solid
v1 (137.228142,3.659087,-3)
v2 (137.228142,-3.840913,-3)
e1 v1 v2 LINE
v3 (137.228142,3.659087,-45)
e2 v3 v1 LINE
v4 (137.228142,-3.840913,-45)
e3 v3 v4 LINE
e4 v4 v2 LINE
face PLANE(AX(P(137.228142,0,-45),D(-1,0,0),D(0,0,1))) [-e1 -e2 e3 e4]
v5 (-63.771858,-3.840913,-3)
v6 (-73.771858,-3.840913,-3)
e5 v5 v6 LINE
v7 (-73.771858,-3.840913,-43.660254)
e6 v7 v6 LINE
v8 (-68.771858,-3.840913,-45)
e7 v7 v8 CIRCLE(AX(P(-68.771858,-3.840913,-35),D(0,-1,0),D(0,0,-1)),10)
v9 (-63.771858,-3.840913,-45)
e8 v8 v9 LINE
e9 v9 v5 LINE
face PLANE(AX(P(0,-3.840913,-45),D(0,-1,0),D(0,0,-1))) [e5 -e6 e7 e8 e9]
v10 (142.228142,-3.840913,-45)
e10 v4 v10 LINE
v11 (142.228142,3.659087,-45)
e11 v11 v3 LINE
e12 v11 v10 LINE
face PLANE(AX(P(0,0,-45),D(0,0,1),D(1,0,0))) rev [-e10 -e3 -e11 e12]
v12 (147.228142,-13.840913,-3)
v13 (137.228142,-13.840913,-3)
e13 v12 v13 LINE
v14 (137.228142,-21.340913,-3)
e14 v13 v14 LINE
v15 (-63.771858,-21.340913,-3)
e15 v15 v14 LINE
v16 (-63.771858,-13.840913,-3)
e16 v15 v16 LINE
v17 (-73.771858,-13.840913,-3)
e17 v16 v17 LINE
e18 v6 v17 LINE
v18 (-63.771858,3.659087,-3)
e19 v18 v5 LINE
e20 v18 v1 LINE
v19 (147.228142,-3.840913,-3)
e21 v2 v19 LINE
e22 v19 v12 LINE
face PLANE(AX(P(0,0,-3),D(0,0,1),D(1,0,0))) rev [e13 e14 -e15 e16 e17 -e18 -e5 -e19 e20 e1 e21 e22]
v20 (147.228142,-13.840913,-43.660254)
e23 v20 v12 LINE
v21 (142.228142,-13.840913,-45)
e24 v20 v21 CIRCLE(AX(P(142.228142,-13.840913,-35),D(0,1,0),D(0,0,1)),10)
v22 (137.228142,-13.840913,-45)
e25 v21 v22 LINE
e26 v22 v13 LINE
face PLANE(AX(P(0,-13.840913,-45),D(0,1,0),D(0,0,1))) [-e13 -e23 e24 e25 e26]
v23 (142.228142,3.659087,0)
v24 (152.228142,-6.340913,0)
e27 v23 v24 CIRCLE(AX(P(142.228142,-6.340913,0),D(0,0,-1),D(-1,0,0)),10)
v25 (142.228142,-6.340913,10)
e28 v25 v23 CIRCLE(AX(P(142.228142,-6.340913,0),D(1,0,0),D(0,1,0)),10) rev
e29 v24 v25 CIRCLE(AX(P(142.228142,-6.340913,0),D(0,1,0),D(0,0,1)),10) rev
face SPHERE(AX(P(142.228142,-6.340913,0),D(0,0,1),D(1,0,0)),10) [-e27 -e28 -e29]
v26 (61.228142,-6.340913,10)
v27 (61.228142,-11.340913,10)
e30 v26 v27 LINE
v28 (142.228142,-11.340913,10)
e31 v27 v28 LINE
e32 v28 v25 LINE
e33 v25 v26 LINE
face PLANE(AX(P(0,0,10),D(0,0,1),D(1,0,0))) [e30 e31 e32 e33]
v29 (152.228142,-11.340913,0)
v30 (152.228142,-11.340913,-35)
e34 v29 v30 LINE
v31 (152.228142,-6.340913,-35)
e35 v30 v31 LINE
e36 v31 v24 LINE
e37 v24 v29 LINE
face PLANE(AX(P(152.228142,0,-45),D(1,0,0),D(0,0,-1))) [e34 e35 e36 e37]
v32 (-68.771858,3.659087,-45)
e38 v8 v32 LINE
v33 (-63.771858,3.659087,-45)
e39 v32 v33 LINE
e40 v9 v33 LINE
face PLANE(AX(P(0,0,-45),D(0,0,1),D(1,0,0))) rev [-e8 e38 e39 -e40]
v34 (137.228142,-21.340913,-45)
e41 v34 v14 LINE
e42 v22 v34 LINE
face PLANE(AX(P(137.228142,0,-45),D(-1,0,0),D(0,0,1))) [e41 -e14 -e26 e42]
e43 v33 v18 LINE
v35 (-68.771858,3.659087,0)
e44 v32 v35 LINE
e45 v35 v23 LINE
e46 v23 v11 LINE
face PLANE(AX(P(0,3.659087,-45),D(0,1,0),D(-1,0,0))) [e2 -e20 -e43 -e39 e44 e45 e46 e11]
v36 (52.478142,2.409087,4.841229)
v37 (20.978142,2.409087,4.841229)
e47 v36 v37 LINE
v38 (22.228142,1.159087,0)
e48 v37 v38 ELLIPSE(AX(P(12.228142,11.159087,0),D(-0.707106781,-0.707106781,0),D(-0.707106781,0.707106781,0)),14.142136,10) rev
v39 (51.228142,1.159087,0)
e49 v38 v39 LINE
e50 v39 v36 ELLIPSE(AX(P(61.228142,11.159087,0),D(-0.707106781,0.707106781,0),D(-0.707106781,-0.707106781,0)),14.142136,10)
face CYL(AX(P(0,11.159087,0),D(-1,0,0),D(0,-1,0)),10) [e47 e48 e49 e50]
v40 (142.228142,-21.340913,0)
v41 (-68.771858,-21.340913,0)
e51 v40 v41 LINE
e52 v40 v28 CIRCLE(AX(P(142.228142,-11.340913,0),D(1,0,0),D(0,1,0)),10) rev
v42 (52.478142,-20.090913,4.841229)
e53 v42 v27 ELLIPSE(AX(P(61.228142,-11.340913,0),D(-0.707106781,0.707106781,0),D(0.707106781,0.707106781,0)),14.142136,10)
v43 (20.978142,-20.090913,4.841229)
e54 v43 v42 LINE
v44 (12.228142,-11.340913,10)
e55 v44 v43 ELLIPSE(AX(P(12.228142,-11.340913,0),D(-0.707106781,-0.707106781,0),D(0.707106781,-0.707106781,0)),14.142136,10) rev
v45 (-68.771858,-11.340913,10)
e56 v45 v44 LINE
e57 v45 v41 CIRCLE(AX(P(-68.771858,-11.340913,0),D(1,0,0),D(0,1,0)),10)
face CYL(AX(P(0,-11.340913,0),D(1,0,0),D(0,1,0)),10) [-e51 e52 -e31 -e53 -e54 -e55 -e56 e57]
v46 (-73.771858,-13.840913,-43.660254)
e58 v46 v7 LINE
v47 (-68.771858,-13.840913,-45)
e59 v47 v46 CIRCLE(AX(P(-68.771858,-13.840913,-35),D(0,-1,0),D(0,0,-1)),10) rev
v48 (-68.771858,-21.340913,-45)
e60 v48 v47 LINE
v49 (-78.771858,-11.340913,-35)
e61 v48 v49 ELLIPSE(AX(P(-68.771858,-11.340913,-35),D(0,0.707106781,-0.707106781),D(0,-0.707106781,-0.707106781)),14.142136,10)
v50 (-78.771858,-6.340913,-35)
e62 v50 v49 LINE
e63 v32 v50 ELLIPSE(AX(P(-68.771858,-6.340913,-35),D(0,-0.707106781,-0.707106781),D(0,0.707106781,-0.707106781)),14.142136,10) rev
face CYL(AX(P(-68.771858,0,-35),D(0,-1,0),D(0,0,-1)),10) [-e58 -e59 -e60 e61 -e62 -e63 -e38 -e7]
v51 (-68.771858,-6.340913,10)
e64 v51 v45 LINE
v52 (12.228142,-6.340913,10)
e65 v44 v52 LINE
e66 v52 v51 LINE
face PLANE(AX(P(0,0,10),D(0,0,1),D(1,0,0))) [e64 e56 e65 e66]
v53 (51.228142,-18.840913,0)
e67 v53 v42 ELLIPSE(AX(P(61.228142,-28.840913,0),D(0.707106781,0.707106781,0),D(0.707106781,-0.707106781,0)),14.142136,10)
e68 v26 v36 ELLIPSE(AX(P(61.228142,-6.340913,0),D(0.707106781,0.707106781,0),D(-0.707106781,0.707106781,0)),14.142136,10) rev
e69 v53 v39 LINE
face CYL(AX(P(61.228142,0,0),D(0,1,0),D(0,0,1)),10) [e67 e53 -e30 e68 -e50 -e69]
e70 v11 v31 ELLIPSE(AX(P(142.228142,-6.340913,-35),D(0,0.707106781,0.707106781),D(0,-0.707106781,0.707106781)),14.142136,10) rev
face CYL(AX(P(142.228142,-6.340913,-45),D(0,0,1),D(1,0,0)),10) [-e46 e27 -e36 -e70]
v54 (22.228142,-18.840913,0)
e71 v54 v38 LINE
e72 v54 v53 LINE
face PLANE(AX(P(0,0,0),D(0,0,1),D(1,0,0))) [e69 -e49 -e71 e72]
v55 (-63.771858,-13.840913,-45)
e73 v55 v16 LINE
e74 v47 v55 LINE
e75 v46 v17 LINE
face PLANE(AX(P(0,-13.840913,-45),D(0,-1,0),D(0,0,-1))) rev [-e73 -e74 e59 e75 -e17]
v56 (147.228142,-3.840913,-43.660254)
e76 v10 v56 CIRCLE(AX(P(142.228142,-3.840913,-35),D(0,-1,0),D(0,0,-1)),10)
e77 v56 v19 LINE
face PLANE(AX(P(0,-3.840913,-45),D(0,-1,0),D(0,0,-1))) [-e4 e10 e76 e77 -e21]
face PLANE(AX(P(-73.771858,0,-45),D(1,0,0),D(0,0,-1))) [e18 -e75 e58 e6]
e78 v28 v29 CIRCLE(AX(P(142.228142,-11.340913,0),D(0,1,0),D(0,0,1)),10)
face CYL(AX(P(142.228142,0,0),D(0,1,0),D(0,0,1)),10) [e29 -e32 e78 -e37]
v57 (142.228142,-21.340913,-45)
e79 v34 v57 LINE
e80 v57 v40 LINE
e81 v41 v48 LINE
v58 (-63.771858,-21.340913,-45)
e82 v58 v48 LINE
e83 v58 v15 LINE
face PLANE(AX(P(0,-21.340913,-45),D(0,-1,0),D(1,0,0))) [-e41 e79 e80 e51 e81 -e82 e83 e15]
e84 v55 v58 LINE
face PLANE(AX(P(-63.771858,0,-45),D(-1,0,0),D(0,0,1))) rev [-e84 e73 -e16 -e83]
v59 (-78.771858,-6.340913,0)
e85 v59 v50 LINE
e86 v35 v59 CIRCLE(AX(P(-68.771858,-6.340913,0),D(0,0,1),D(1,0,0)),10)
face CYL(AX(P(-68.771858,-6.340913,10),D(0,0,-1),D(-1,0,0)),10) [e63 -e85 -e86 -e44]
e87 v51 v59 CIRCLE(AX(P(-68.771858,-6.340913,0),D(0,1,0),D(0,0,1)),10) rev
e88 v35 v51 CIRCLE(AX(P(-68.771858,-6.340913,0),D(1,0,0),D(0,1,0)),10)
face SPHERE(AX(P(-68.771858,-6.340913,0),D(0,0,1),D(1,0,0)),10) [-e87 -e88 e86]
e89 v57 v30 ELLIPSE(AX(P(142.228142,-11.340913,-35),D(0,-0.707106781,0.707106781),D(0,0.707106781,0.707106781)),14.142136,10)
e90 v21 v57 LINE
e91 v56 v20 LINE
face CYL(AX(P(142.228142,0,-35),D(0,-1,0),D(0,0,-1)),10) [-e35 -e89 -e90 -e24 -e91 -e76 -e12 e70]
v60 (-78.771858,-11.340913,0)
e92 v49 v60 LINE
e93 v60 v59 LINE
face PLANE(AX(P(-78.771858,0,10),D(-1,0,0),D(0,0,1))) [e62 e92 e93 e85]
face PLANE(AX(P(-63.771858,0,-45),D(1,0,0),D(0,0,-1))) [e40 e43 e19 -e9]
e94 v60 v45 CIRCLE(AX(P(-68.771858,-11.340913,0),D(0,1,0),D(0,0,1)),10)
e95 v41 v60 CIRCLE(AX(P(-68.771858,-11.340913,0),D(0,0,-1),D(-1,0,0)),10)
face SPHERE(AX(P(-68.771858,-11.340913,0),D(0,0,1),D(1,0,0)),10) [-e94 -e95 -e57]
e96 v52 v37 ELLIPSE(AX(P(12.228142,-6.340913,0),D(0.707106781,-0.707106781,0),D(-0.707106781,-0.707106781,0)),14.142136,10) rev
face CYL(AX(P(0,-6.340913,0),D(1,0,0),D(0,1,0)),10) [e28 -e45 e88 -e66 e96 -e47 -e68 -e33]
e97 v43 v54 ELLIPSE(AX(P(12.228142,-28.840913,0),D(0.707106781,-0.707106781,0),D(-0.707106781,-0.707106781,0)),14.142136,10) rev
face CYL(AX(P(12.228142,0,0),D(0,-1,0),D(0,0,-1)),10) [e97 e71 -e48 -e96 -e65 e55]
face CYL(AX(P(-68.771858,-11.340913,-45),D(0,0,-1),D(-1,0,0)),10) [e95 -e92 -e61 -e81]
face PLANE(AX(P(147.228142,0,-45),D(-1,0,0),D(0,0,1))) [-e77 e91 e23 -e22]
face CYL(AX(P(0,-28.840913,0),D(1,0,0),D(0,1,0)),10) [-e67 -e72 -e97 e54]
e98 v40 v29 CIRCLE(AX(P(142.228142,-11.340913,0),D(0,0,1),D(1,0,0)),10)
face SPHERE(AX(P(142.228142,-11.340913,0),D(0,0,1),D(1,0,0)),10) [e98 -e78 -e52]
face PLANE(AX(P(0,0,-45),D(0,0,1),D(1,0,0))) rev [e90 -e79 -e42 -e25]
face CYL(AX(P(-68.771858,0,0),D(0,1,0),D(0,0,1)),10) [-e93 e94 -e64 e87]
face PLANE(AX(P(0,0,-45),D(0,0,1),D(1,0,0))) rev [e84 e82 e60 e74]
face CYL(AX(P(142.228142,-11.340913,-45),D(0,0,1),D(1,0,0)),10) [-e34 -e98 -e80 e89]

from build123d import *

# Parameters (mm, degrees)
BOSS_EXTRUDE1_DEPTH   = 45
BOSS_EXTRUDE1_2_DEPTH = 45
SKETCH1_3_W           = 231
SKETCH1_3_H           = 25
SKETCH1_3_W_2         = 29
SKETCH1_3_H_2         = 20
BOSS_EXTRUDE2_DEPTH   = 10
BOSS_EXTRUDE3_DEPTH   = 3
FILLET1_R             = 10
FILLET2_R             = 10
FILLET3_R             = 10


with BuildPart() as part:
    # Sketch1 → Boss-Extrude1 (new body)
    with BuildSketch(Plane.XY):
        Polygon((-63.771858253, 3.659087495), (-78.771858253, 3.659087495), (-78.771858253, -21.340912505), (-63.771858253, -21.340912505), (-63.771858253, -13.840912505), (-73.771858253, -13.840912505), (-73.771858253, -3.840912505), (-63.771858253, -3.840912505), align=None)
    extrude(amount=-BOSS_EXTRUDE1_DEPTH)



with BuildPart() as body_2:
    # Sketch1 → Boss-Extrude1 2 (new body)
    with BuildSketch(Plane.XY):
        Polygon((137.228141747, 3.659087495), (137.228141747, -3.840912505), (147.228141747, -3.840912505), (147.228141747, -13.840912505), (137.228141747, -13.840912505), (137.228141747, -21.340912505), (152.228141747, -21.340912505), (152.228141747, 3.659087495), align=None)
    extrude(amount=-BOSS_EXTRUDE1_2_DEPTH)


with BuildPart() as part_1:
    add(part.part)

    add(body_2.part)  # Boss-Extrude2 merges body 2
    # Sketch1<3> → Boss-Extrude2 (add)
    with BuildSketch(Plane.XY):
        with Locations((36.728141747, -8.840912505)):
            Rectangle(SKETCH1_3_W, SKETCH1_3_H)
        with Locations((36.728141747, -8.840912505)):
            Rectangle(SKETCH1_3_W_2, SKETCH1_3_H_2, mode=Mode.SUBTRACT)
    extrude(amount=BOSS_EXTRUDE2_DEPTH)

    # Sketch1<4> → Boss-Extrude3 (add)
    with BuildSketch(Plane.XY):
        Polygon((137.228141747, 3.659087495), (-63.771858253, 3.659087495), (-63.771858253, -3.840912505), (-73.771858253, -3.840912505), (-73.771858253, -13.840912505), (-63.771858253, -13.840912505), (-63.771858253, -21.340912505), (137.228141747, -21.340912505), (137.228141747, -13.840912505), (147.228141747, -13.840912505), (147.228141747, -3.840912505), (137.228141747, -3.840912505), align=None)
    extrude(amount=-BOSS_EXTRUDE3_DEPTH)

    # Fillet1
    # the kernel refuses this fillet: 10 mm, written as the material it takes off along each edge
    with BuildSketch(Plane(origin=(22.228141747, 1.159087495, 10), x_dir=(0, 1, 0), z_dir=(1, 0, 0)), Plane(origin=(51.228141747, -18.840912505, 10), x_dir=(0, -1, 0), z_dir=(-1, 0, 0))) as fillet1_piece_1:
        with BuildLine():
            CenterArc((FILLET1_R, -FILLET1_R), FILLET1_R, 90, 90)
            Line((0, -FILLET1_R), (-FILLET1_R * 0.02, -FILLET1_R))
            Line((-FILLET1_R * 0.02, -FILLET1_R), (-FILLET1_R * 0.02, FILLET1_R * 0.02))
            Line((-FILLET1_R * 0.02, FILLET1_R * 0.02), (FILLET1_R, FILLET1_R * 0.02))
            Line((FILLET1_R, FILLET1_R * 0.02), (FILLET1_R, 0))
        make_face()
    extrude(amount=29, mode=Mode.SUBTRACT)
    with BuildSketch(Plane(origin=(22.228141747, -18.840912505, 10), x_dir=(-1, 0, 0), z_dir=(0, 1, 0)), Plane(origin=(51.228141747, 1.159087495, 10), x_dir=(1, 0, 0), z_dir=(0, -1, 0))) as fillet1_piece_2:
        with BuildLine():
            CenterArc((FILLET1_R, -FILLET1_R), FILLET1_R, 90, 90)
            Line((0, -FILLET1_R), (-FILLET1_R * 0.02, -FILLET1_R))
            Line((-FILLET1_R * 0.02, -FILLET1_R), (-FILLET1_R * 0.02, FILLET1_R * 0.02))
            Line((-FILLET1_R * 0.02, FILLET1_R * 0.02), (FILLET1_R, FILLET1_R * 0.02))
            Line((FILLET1_R, FILLET1_R * 0.02), (FILLET1_R, 0))
        make_face()
    extrude(amount=20, mode=Mode.SUBTRACT)
    with BuildSketch(Plane(origin=(-78.771858253, 3.659087495, 10), x_dir=(0, 0, -1), z_dir=(0, -1, 0))) as fillet1_piece_3:
        with BuildLine():
            CenterArc((FILLET1_R, FILLET1_R), FILLET1_R, 180, 90)
            Line((0, FILLET1_R), (-FILLET1_R * 0.02, FILLET1_R))
            Line((-FILLET1_R * 0.02, FILLET1_R), (-FILLET1_R * 0.02, -FILLET1_R * 0.02))
            Line((-FILLET1_R * 0.02, -FILLET1_R * 0.02), (FILLET1_R, -FILLET1_R * 0.02))
            Line((FILLET1_R, -FILLET1_R * 0.02), (FILLET1_R, 0))
        make_face()
    extrude(amount=25, mode=Mode.SUBTRACT)
    with BuildSketch(Plane(origin=(152.228141747, 3.659087495, 10), x_dir=(0, 0, -1), z_dir=(-1, 0, 0)), Plane(origin=(-78.771858253, -21.340912505, 10), x_dir=(0, 0, -1), z_dir=(1, 0, 0))) as fillet1_piece_4:
        with BuildLine():
            CenterArc((FILLET1_R, FILLET1_R), FILLET1_R, 180, 90)
            Line((0, FILLET1_R), (-FILLET1_R * 0.02, FILLET1_R))
            Line((-FILLET1_R * 0.02, FILLET1_R), (-FILLET1_R * 0.02, -FILLET1_R * 0.02))
            Line((-FILLET1_R * 0.02, -FILLET1_R * 0.02), (FILLET1_R, -FILLET1_R * 0.02))
            Line((FILLET1_R, -FILLET1_R * 0.02), (FILLET1_R, 0))
        make_face()
    extrude(amount=231, mode=Mode.SUBTRACT)
    with BuildSketch(Plane(origin=(152.228141747, -21.340912505, 10), x_dir=(-1, 0, 0), z_dir=(0, 1, 0))) as fillet1_piece_5:
        with BuildLine():
            CenterArc((FILLET1_R, -FILLET1_R), FILLET1_R, 90, 90)
            Line((0, -FILLET1_R), (-FILLET1_R * 0.02, -FILLET1_R))
            Line((-FILLET1_R * 0.02, -FILLET1_R), (-FILLET1_R * 0.02, FILLET1_R * 0.02))
            Line((-FILLET1_R * 0.02, FILLET1_R * 0.02), (FILLET1_R, FILLET1_R * 0.02))
            Line((FILLET1_R, FILLET1_R * 0.02), (FILLET1_R, 0))
        make_face()
    extrude(amount=25, mode=Mode.SUBTRACT)
    with BuildSketch(Plane(origin=(22.228141747, -18.840912505, 10), x_dir=(-1, 0, 0), z_dir=(0, 1, 0))) as fillet1_piece_6a_section:
        with BuildLine():
            CenterArc((FILLET1_R, -FILLET1_R), FILLET1_R, 90, 90)
            Line((0, -FILLET1_R), (-FILLET1_R * 0.02, -FILLET1_R))
            Line((-FILLET1_R * 0.02, -FILLET1_R), (-FILLET1_R * 0.02, FILLET1_R * 0.02))
            Line((-FILLET1_R * 0.02, FILLET1_R * 0.02), (FILLET1_R, FILLET1_R * 0.02))
            Line((FILLET1_R, FILLET1_R * 0.02), (FILLET1_R, 0))
        make_face()
    fillet1_piece_6a = extrude(amount=45, mode=Mode.PRIVATE)
    fillet1_piece_6a = split(fillet1_piece_6a, bisect_by=Plane(origin=(19.964190605, 1.159087495, 7.736048857), z_dir=(0, 1, 0)), keep=Keep.TOP, mode=Mode.PRIVATE)
    with BuildSketch(Plane(origin=(-2.771858253, 1.159087495, 10), x_dir=(0, 1, 0), z_dir=(1, 0, 0))) as fillet1_piece_6b_section:
        with BuildLine():
            CenterArc((FILLET1_R, -FILLET1_R), FILLET1_R, 90, 90)
            Line((0, -FILLET1_R), (-FILLET1_R * 0.02, -FILLET1_R))
            Line((-FILLET1_R * 0.02, -FILLET1_R), (-FILLET1_R * 0.02, FILLET1_R * 0.02))
            Line((-FILLET1_R * 0.02, FILLET1_R * 0.02), (FILLET1_R, FILLET1_R * 0.02))
            Line((FILLET1_R, FILLET1_R * 0.02), (FILLET1_R, 0))
        make_face()
    fillet1_piece_6b = extrude(amount=54, mode=Mode.PRIVATE)
    fillet1_piece_6b = split(fillet1_piece_6b, bisect_by=Plane(origin=(22.228141747, 3.423038638, 7.736048857), z_dir=(-1, 0, 0)), keep=Keep.TOP, mode=Mode.PRIVATE)
    fillet1_piece_6 = fillet1_piece_6a & fillet1_piece_6b
    add(fillet1_piece_6, mode=Mode.SUBTRACT)
    with BuildSketch(Plane(origin=(22.228141747, 1.159087495, 10), x_dir=(0, 1, 0), z_dir=(1, 0, 0))) as fillet1_piece_7a_section:
        with BuildLine():
            CenterArc((FILLET1_R, -FILLET1_R), FILLET1_R, 90, 90)
            Line((0, -FILLET1_R), (-FILLET1_R * 0.02, -FILLET1_R))
            Line((-FILLET1_R * 0.02, -FILLET1_R), (-FILLET1_R * 0.02, FILLET1_R * 0.02))
            Line((-FILLET1_R * 0.02, FILLET1_R * 0.02), (FILLET1_R, FILLET1_R * 0.02))
            Line((FILLET1_R, FILLET1_R * 0.02), (FILLET1_R, 0))
        make_face()
    fillet1_piece_7a = extrude(amount=54, mode=Mode.PRIVATE)
    fillet1_piece_7a = split(fillet1_piece_7a, bisect_by=Plane(origin=(51.228141747, 3.423038638, 7.736048857), z_dir=(1, 0, 0)), keep=Keep.TOP, mode=Mode.PRIVATE)
    with BuildSketch(Plane(origin=(51.228141747, 26.159087495, 10), x_dir=(1, 0, 0), z_dir=(0, -1, 0))) as fillet1_piece_7b_section:
        with BuildLine():
            CenterArc((FILLET1_R, -FILLET1_R), FILLET1_R, 90, 90)
            Line((0, -FILLET1_R), (-FILLET1_R * 0.02, -FILLET1_R))
            Line((-FILLET1_R * 0.02, -FILLET1_R), (-FILLET1_R * 0.02, FILLET1_R * 0.02))
            Line((-FILLET1_R * 0.02, FILLET1_R * 0.02), (FILLET1_R, FILLET1_R * 0.02))
            Line((FILLET1_R, FILLET1_R * 0.02), (FILLET1_R, 0))
        make_face()
    fillet1_piece_7b = extrude(amount=45, mode=Mode.PRIVATE)
    fillet1_piece_7b = split(fillet1_piece_7b, bisect_by=Plane(origin=(53.49209289, 1.159087495, 7.736048857), z_dir=(0, 1, 0)), keep=Keep.TOP, mode=Mode.PRIVATE)
    fillet1_piece_7 = fillet1_piece_7a & fillet1_piece_7b
    add(fillet1_piece_7, mode=Mode.SUBTRACT)
    with BuildSketch(Plane(origin=(51.228141747, -18.840912505, 10), x_dir=(0, -1, 0), z_dir=(-1, 0, 0))) as fillet1_piece_8a_section:
        with BuildLine():
            CenterArc((FILLET1_R, -FILLET1_R), FILLET1_R, 90, 90)
            Line((0, -FILLET1_R), (-FILLET1_R * 0.02, -FILLET1_R))
            Line((-FILLET1_R * 0.02, -FILLET1_R), (-FILLET1_R * 0.02, FILLET1_R * 0.02))
            Line((-FILLET1_R * 0.02, FILLET1_R * 0.02), (FILLET1_R, FILLET1_R * 0.02))
            Line((FILLET1_R, FILLET1_R * 0.02), (FILLET1_R, 0))
        make_face()
    fillet1_piece_8a = extrude(amount=54, mode=Mode.PRIVATE)
    fillet1_piece_8a = split(fillet1_piece_8a, bisect_by=Plane(origin=(22.228141747, -21.104863647, 7.736048857), z_dir=(-1, 0, 0)), keep=Keep.TOP, mode=Mode.PRIVATE)
    with BuildSketch(Plane(origin=(22.228141747, -43.840912505, 10), x_dir=(-1, 0, 0), z_dir=(0, 1, 0))) as fillet1_piece_8b_section:
        with BuildLine():
            CenterArc((FILLET1_R, -FILLET1_R), FILLET1_R, 90, 90)
            Line((0, -FILLET1_R), (-FILLET1_R * 0.02, -FILLET1_R))
            Line((-FILLET1_R * 0.02, -FILLET1_R), (-FILLET1_R * 0.02, FILLET1_R * 0.02))
            Line((-FILLET1_R * 0.02, FILLET1_R * 0.02), (FILLET1_R, FILLET1_R * 0.02))
            Line((FILLET1_R, FILLET1_R * 0.02), (FILLET1_R, 0))
        make_face()
    fillet1_piece_8b = extrude(amount=45, mode=Mode.PRIVATE)
    fillet1_piece_8b = split(fillet1_piece_8b, bisect_by=Plane(origin=(19.964190605, -18.840912505, 7.736048857), z_dir=(0, -1, 0)), keep=Keep.TOP, mode=Mode.PRIVATE)
    fillet1_piece_8 = fillet1_piece_8a & fillet1_piece_8b
    add(fillet1_piece_8, mode=Mode.SUBTRACT)
    with BuildSketch(Plane(origin=(76.228141747, -18.840912505, 10), x_dir=(0, -1, 0), z_dir=(-1, 0, 0))) as fillet1_piece_9a_section:
        with BuildLine():
            CenterArc((FILLET1_R, -FILLET1_R), FILLET1_R, 90, 90)
            Line((0, -FILLET1_R), (-FILLET1_R * 0.02, -FILLET1_R))
            Line((-FILLET1_R * 0.02, -FILLET1_R), (-FILLET1_R * 0.02, FILLET1_R * 0.02))
            Line((-FILLET1_R * 0.02, FILLET1_R * 0.02), (FILLET1_R, FILLET1_R * 0.02))
            Line((FILLET1_R, FILLET1_R * 0.02), (FILLET1_R, 0))
        make_face()
    fillet1_piece_9a = extrude(amount=54, mode=Mode.PRIVATE)
    fillet1_piece_9a = split(fillet1_piece_9a, bisect_by=Plane(origin=(51.228141747, -21.104863647, 7.736048857), z_dir=(1, 0, 0)), keep=Keep.TOP, mode=Mode.PRIVATE)
    with BuildSketch(Plane(origin=(51.228141747, 1.159087495, 10), x_dir=(1, 0, 0), z_dir=(0, -1, 0))) as fillet1_piece_9b_section:
        with BuildLine():
            CenterArc((FILLET1_R, -FILLET1_R), FILLET1_R, 90, 90)
            Line((0, -FILLET1_R), (-FILLET1_R * 0.02, -FILLET1_R))
            Line((-FILLET1_R * 0.02, -FILLET1_R), (-FILLET1_R * 0.02, FILLET1_R * 0.02))
            Line((-FILLET1_R * 0.02, FILLET1_R * 0.02), (FILLET1_R, FILLET1_R * 0.02))
            Line((FILLET1_R, FILLET1_R * 0.02), (FILLET1_R, 0))
        make_face()
    fillet1_piece_9b = extrude(amount=45, mode=Mode.PRIVATE)
    fillet1_piece_9b = split(fillet1_piece_9b, bisect_by=Plane(origin=(53.49209289, -18.840912505, 7.736048857), z_dir=(0, -1, 0)), keep=Keep.TOP, mode=Mode.PRIVATE)
    fillet1_piece_9 = fillet1_piece_9a & fillet1_piece_9b
    add(fillet1_piece_9, mode=Mode.SUBTRACT)
    with BuildSketch(Plane(origin=(152.228141747, 3.659087495, 10), x_dir=(0, 0, -1), z_dir=(-1, 0, 0))) as fillet1_piece_10a_section:
        with BuildLine():
            CenterArc((FILLET1_R, FILLET1_R), FILLET1_R, 180, 90)
            Line((0, FILLET1_R), (-FILLET1_R * 0.02, FILLET1_R))
            Line((-FILLET1_R * 0.02, FILLET1_R), (-FILLET1_R * 0.02, -FILLET1_R * 0.02))
            Line((-FILLET1_R * 0.02, -FILLET1_R * 0.02), (FILLET1_R, -FILLET1_R * 0.02))
            Line((FILLET1_R, -FILLET1_R * 0.02), (FILLET1_R, 0))
        make_face()
    fillet1_piece_10a = extrude(amount=256, mode=Mode.PRIVATE)
    fillet1_piece_10a = split(fillet1_piece_10a, bisect_by=Plane(origin=(-78.771858253, 1.395136353, 7.736048857), z_dir=(-1, 0, 0)), keep=Keep.TOP, mode=Mode.PRIVATE)
    with BuildSketch(Plane(origin=(-78.771858253, 28.659087495, 10), x_dir=(0, 0, -1), z_dir=(0, -1, 0))) as fillet1_piece_10b_section:
        with BuildLine():
            CenterArc((FILLET1_R, FILLET1_R), FILLET1_R, 180, 90)
            Line((0, FILLET1_R), (-FILLET1_R * 0.02, FILLET1_R))
            Line((-FILLET1_R * 0.02, FILLET1_R), (-FILLET1_R * 0.02, -FILLET1_R * 0.02))
            Line((-FILLET1_R * 0.02, -FILLET1_R * 0.02), (FILLET1_R, -FILLET1_R * 0.02))
            Line((FILLET1_R, -FILLET1_R * 0.02), (FILLET1_R, 0))
        make_face()
    fillet1_piece_10b = extrude(amount=50, mode=Mode.PRIVATE)
    fillet1_piece_10b = split(fillet1_piece_10b, bisect_by=Plane(origin=(-76.50790711, 3.659087495, 7.736048857), z_dir=(0, 1, 0)), keep=Keep.TOP, mode=Mode.PRIVATE)
    fillet1_piece_10 = fillet1_piece_10a & fillet1_piece_10b
    add(fillet1_piece_10, mode=Mode.SUBTRACT)
    with BuildSketch(Plane(origin=(-103.771858253, -21.340912505, 10), x_dir=(0, 0, -1), z_dir=(1, 0, 0))) as fillet1_piece_11a_section:
        with BuildLine():
            CenterArc((FILLET1_R, FILLET1_R), FILLET1_R, 180, 90)
            Line((0, FILLET1_R), (-FILLET1_R * 0.02, FILLET1_R))
            Line((-FILLET1_R * 0.02, FILLET1_R), (-FILLET1_R * 0.02, -FILLET1_R * 0.02))
            Line((-FILLET1_R * 0.02, -FILLET1_R * 0.02), (FILLET1_R, -FILLET1_R * 0.02))
            Line((FILLET1_R, -FILLET1_R * 0.02), (FILLET1_R, 0))
        make_face()
    fillet1_piece_11a = extrude(amount=256, mode=Mode.PRIVATE)
    fillet1_piece_11a = split(fillet1_piece_11a, bisect_by=Plane(origin=(-78.771858253, -19.076961362, 7.736048857), z_dir=(-1, 0, 0)), keep=Keep.TOP, mode=Mode.PRIVATE)
    with BuildSketch(Plane(origin=(-78.771858253, 3.659087495, 10), x_dir=(0, 0, -1), z_dir=(0, -1, 0))) as fillet1_piece_11b_section:
        with BuildLine():
            CenterArc((FILLET1_R, FILLET1_R), FILLET1_R, 180, 90)
            Line((0, FILLET1_R), (-FILLET1_R * 0.02, FILLET1_R))
            Line((-FILLET1_R * 0.02, FILLET1_R), (-FILLET1_R * 0.02, -FILLET1_R * 0.02))
            Line((-FILLET1_R * 0.02, -FILLET1_R * 0.02), (FILLET1_R, -FILLET1_R * 0.02))
            Line((FILLET1_R, -FILLET1_R * 0.02), (FILLET1_R, 0))
        make_face()
    fillet1_piece_11b = extrude(amount=50, mode=Mode.PRIVATE)
    fillet1_piece_11b = split(fillet1_piece_11b, bisect_by=Plane(origin=(-76.50790711, -21.340912505, 7.736048857), z_dir=(0, -1, 0)), keep=Keep.TOP, mode=Mode.PRIVATE)
    fillet1_piece_11 = fillet1_piece_11a & fillet1_piece_11b
    add(fillet1_piece_11, mode=Mode.SUBTRACT)
    with BuildSketch(Plane(origin=(177.228141747, 3.659087495, 10), x_dir=(0, 0, -1), z_dir=(-1, 0, 0))) as fillet1_piece_12a_section:
        with BuildLine():
            CenterArc((FILLET1_R, FILLET1_R), FILLET1_R, 180, 90)
            Line((0, FILLET1_R), (-FILLET1_R * 0.02, FILLET1_R))
            Line((-FILLET1_R * 0.02, FILLET1_R), (-FILLET1_R * 0.02, -FILLET1_R * 0.02))
            Line((-FILLET1_R * 0.02, -FILLET1_R * 0.02), (FILLET1_R, -FILLET1_R * 0.02))
            Line((FILLET1_R, -FILLET1_R * 0.02), (FILLET1_R, 0))
        make_face()
    fillet1_piece_12a = extrude(amount=256, mode=Mode.PRIVATE)
    fillet1_piece_12a = split(fillet1_piece_12a, bisect_by=Plane(origin=(152.228141747, 1.395136353, 7.736048857), z_dir=(1, 0, 0)), keep=Keep.TOP, mode=Mode.PRIVATE)
    with BuildSketch(Plane(origin=(152.228141747, -21.340912505, 10), x_dir=(-1, 0, 0), z_dir=(0, 1, 0))) as fillet1_piece_12b_section:
        with BuildLine():
            CenterArc((FILLET1_R, -FILLET1_R), FILLET1_R, 90, 90)
            Line((0, -FILLET1_R), (-FILLET1_R * 0.02, -FILLET1_R))
            Line((-FILLET1_R * 0.02, -FILLET1_R), (-FILLET1_R * 0.02, FILLET1_R * 0.02))
            Line((-FILLET1_R * 0.02, FILLET1_R * 0.02), (FILLET1_R, FILLET1_R * 0.02))
            Line((FILLET1_R, FILLET1_R * 0.02), (FILLET1_R, 0))
        make_face()
    fillet1_piece_12b = extrude(amount=50, mode=Mode.PRIVATE)
    fillet1_piece_12b = split(fillet1_piece_12b, bisect_by=Plane(origin=(149.964190605, 3.659087495, 7.736048857), z_dir=(0, 1, 0)), keep=Keep.TOP, mode=Mode.PRIVATE)
    fillet1_piece_12 = fillet1_piece_12a & fillet1_piece_12b
    add(fillet1_piece_12, mode=Mode.SUBTRACT)
    with BuildSketch(Plane(origin=(-78.771858253, -21.340912505, 10), x_dir=(0, 0, -1), z_dir=(1, 0, 0))) as fillet1_piece_13a_section:
        with BuildLine():
            CenterArc((FILLET1_R, FILLET1_R), FILLET1_R, 180, 90)
            Line((0, FILLET1_R), (-FILLET1_R * 0.02, FILLET1_R))
            Line((-FILLET1_R * 0.02, FILLET1_R), (-FILLET1_R * 0.02, -FILLET1_R * 0.02))
            Line((-FILLET1_R * 0.02, -FILLET1_R * 0.02), (FILLET1_R, -FILLET1_R * 0.02))
            Line((FILLET1_R, -FILLET1_R * 0.02), (FILLET1_R, 0))
        make_face()
    fillet1_piece_13a = extrude(amount=256, mode=Mode.PRIVATE)
    fillet1_piece_13a = split(fillet1_piece_13a, bisect_by=Plane(origin=(152.228141747, -19.076961362, 7.736048857), z_dir=(1, 0, 0)), keep=Keep.TOP, mode=Mode.PRIVATE)
    with BuildSketch(Plane(origin=(152.228141747, -46.340912505, 10), x_dir=(-1, 0, 0), z_dir=(0, 1, 0))) as fillet1_piece_13b_section:
        with BuildLine():
            CenterArc((FILLET1_R, -FILLET1_R), FILLET1_R, 90, 90)
            Line((0, -FILLET1_R), (-FILLET1_R * 0.02, -FILLET1_R))
            Line((-FILLET1_R * 0.02, -FILLET1_R), (-FILLET1_R * 0.02, FILLET1_R * 0.02))
            Line((-FILLET1_R * 0.02, FILLET1_R * 0.02), (FILLET1_R, FILLET1_R * 0.02))
            Line((FILLET1_R, FILLET1_R * 0.02), (FILLET1_R, 0))
        make_face()
    fillet1_piece_13b = extrude(amount=50, mode=Mode.PRIVATE)
    fillet1_piece_13b = split(fillet1_piece_13b, bisect_by=Plane(origin=(149.964190605, -21.340912505, 7.736048857), z_dir=(0, -1, 0)), keep=Keep.TOP, mode=Mode.PRIVATE)
    fillet1_piece_13 = fillet1_piece_13a & fillet1_piece_13b
    add(fillet1_piece_13, mode=Mode.SUBTRACT)

    # Fillet2
    # the kernel refuses this fillet: 10 mm, written as the material it takes off along each edge
    with BuildSketch(Plane(origin=(142.228141747, -11.340912505, 0), x_dir=(1, 0, 0), z_dir=(0, -1, 0))) as fillet2_piece_1_section:
        Polygon((0, 0), (FILLET2_R, 0), (FILLET2_R, FILLET2_R), (0, FILLET2_R), align=None)
    fillet2_piece_1 = extrude(amount=FILLET2_R, mode=Mode.PRIVATE)
    fillet2_piece_1 = fillet2_piece_1 - Plane(origin=(142.228141747, -11.340912505, 0), x_dir=(-0.7071067811865475, 0, -0.7071067811865475), z_dir=(0, -1, 0)) * Sphere(FILLET2_R, mode=Mode.PRIVATE)
    add(fillet2_piece_1, mode=Mode.SUBTRACT)
    with BuildSketch(Plane(origin=(142.228141747, -6.340912505, 0), x_dir=(1, 0, 0), z_dir=(0, 1, 0))) as fillet2_piece_2_section:
        Polygon((0, 0), (FILLET2_R, 0), (FILLET2_R, -FILLET2_R), (0, -FILLET2_R), align=None)
    fillet2_piece_2 = extrude(amount=FILLET2_R, mode=Mode.PRIVATE)
    fillet2_piece_2 = fillet2_piece_2 - Plane(origin=(142.228141747, -6.340912505, 0), x_dir=(-0.7071067811865475, 0, -0.7071067811865475), z_dir=(0, 1, 0)) * Sphere(FILLET2_R, mode=Mode.PRIVATE)
    add(fillet2_piece_2, mode=Mode.SUBTRACT)
    with BuildSketch(Plane(origin=(152.228141747, -46.340912505, -45), x_dir=(-1, 0, 0), z_dir=(0, 1, 0))) as fillet2_piece_3:
        with BuildLine():
            CenterArc((FILLET2_R, FILLET2_R), FILLET2_R, 180, 90)
            Line((0, FILLET2_R), (0, 0))
            Line((0, 0), (FILLET2_R, 0))
        make_face()
    extrude(amount=75, mode=Mode.SUBTRACT)
    with BuildSketch(Plane(origin=(152.228141747, -21.340912505, -70), x_dir=(-1, 0, 0), z_dir=(0, 0, 1)), Plane(origin=(152.228141747, 3.659087495, 0), x_dir=(-1, 0, 0), z_dir=(0, 0, -1))) as fillet2_piece_4:
        with BuildLine():
            CenterArc((FILLET2_R, -FILLET2_R), FILLET2_R, 90, 90)
            Line((0, -FILLET2_R), (0, 0))
            Line((0, 0), (FILLET2_R, 0))
        make_face()
    extrude(amount=70, mode=Mode.SUBTRACT)

    # Fillet3
    # the kernel refuses this fillet: 10 mm, written as the material it takes off along each edge
    with BuildSketch(Plane(origin=(-68.771858253, -6.340912505, 0), x_dir=(-1, 0, 0), z_dir=(0, 1, 0))) as fillet3_piece_1_section:
        Polygon((0, 0), (FILLET3_R, 0), (FILLET3_R, FILLET3_R), (0, FILLET3_R), align=None)
    fillet3_piece_1 = extrude(amount=FILLET3_R, mode=Mode.PRIVATE)
    fillet3_piece_1 = fillet3_piece_1 - Plane(origin=(-68.771858253, -6.340912505, 0), x_dir=(0.7071067811865475, 0, -0.7071067811865475), z_dir=(0, 1, 0)) * Sphere(FILLET3_R, mode=Mode.PRIVATE)
    add(fillet3_piece_1, mode=Mode.SUBTRACT)
    with BuildSketch(Plane(origin=(-68.771858253, -11.340912505, 0), x_dir=(-1, 0, 0), z_dir=(0, -1, 0))) as fillet3_piece_2_section:
        Polygon((0, 0), (FILLET3_R, 0), (FILLET3_R, -FILLET3_R), (0, -FILLET3_R), align=None)
    fillet3_piece_2 = extrude(amount=FILLET3_R, mode=Mode.PRIVATE)
    fillet3_piece_2 = fillet3_piece_2 - Plane(origin=(-68.771858253, -11.340912505, 0), x_dir=(0.7071067811865475, 0, -0.7071067811865475), z_dir=(0, -1, 0)) * Sphere(FILLET3_R, mode=Mode.PRIVATE)
    add(fillet3_piece_2, mode=Mode.SUBTRACT)
    with BuildSketch(Plane(origin=(-78.771858253, -21.340912505, 0), x_dir=(1, 0, 0), z_dir=(0, 0, -1)), Plane(origin=(-78.771858253, 3.659087495, -70), x_dir=(1, 0, 0), z_dir=(0, 0, 1))) as fillet3_piece_3:
        with BuildLine():
            CenterArc((FILLET3_R, -FILLET3_R), FILLET3_R, 90, 90)
            Line((0, -FILLET3_R), (0, 0))
            Line((0, 0), (FILLET3_R, 0))
        make_face()
    extrude(amount=70, mode=Mode.SUBTRACT)
    with BuildSketch(Plane(origin=(-78.771858253, 28.659087495, -45), x_dir=(1, 0, 0), z_dir=(0, -1, 0))) as fillet3_piece_4:
        with BuildLine():
            CenterArc((FILLET3_R, FILLET3_R), FILLET3_R, 180, 90)
            Line((0, FILLET3_R), (0, 0))
            Line((0, 0), (FILLET3_R, 0))
        make_face()
    extrude(amount=75, mode=Mode.SUBTRACT)


solid = part_1.part
